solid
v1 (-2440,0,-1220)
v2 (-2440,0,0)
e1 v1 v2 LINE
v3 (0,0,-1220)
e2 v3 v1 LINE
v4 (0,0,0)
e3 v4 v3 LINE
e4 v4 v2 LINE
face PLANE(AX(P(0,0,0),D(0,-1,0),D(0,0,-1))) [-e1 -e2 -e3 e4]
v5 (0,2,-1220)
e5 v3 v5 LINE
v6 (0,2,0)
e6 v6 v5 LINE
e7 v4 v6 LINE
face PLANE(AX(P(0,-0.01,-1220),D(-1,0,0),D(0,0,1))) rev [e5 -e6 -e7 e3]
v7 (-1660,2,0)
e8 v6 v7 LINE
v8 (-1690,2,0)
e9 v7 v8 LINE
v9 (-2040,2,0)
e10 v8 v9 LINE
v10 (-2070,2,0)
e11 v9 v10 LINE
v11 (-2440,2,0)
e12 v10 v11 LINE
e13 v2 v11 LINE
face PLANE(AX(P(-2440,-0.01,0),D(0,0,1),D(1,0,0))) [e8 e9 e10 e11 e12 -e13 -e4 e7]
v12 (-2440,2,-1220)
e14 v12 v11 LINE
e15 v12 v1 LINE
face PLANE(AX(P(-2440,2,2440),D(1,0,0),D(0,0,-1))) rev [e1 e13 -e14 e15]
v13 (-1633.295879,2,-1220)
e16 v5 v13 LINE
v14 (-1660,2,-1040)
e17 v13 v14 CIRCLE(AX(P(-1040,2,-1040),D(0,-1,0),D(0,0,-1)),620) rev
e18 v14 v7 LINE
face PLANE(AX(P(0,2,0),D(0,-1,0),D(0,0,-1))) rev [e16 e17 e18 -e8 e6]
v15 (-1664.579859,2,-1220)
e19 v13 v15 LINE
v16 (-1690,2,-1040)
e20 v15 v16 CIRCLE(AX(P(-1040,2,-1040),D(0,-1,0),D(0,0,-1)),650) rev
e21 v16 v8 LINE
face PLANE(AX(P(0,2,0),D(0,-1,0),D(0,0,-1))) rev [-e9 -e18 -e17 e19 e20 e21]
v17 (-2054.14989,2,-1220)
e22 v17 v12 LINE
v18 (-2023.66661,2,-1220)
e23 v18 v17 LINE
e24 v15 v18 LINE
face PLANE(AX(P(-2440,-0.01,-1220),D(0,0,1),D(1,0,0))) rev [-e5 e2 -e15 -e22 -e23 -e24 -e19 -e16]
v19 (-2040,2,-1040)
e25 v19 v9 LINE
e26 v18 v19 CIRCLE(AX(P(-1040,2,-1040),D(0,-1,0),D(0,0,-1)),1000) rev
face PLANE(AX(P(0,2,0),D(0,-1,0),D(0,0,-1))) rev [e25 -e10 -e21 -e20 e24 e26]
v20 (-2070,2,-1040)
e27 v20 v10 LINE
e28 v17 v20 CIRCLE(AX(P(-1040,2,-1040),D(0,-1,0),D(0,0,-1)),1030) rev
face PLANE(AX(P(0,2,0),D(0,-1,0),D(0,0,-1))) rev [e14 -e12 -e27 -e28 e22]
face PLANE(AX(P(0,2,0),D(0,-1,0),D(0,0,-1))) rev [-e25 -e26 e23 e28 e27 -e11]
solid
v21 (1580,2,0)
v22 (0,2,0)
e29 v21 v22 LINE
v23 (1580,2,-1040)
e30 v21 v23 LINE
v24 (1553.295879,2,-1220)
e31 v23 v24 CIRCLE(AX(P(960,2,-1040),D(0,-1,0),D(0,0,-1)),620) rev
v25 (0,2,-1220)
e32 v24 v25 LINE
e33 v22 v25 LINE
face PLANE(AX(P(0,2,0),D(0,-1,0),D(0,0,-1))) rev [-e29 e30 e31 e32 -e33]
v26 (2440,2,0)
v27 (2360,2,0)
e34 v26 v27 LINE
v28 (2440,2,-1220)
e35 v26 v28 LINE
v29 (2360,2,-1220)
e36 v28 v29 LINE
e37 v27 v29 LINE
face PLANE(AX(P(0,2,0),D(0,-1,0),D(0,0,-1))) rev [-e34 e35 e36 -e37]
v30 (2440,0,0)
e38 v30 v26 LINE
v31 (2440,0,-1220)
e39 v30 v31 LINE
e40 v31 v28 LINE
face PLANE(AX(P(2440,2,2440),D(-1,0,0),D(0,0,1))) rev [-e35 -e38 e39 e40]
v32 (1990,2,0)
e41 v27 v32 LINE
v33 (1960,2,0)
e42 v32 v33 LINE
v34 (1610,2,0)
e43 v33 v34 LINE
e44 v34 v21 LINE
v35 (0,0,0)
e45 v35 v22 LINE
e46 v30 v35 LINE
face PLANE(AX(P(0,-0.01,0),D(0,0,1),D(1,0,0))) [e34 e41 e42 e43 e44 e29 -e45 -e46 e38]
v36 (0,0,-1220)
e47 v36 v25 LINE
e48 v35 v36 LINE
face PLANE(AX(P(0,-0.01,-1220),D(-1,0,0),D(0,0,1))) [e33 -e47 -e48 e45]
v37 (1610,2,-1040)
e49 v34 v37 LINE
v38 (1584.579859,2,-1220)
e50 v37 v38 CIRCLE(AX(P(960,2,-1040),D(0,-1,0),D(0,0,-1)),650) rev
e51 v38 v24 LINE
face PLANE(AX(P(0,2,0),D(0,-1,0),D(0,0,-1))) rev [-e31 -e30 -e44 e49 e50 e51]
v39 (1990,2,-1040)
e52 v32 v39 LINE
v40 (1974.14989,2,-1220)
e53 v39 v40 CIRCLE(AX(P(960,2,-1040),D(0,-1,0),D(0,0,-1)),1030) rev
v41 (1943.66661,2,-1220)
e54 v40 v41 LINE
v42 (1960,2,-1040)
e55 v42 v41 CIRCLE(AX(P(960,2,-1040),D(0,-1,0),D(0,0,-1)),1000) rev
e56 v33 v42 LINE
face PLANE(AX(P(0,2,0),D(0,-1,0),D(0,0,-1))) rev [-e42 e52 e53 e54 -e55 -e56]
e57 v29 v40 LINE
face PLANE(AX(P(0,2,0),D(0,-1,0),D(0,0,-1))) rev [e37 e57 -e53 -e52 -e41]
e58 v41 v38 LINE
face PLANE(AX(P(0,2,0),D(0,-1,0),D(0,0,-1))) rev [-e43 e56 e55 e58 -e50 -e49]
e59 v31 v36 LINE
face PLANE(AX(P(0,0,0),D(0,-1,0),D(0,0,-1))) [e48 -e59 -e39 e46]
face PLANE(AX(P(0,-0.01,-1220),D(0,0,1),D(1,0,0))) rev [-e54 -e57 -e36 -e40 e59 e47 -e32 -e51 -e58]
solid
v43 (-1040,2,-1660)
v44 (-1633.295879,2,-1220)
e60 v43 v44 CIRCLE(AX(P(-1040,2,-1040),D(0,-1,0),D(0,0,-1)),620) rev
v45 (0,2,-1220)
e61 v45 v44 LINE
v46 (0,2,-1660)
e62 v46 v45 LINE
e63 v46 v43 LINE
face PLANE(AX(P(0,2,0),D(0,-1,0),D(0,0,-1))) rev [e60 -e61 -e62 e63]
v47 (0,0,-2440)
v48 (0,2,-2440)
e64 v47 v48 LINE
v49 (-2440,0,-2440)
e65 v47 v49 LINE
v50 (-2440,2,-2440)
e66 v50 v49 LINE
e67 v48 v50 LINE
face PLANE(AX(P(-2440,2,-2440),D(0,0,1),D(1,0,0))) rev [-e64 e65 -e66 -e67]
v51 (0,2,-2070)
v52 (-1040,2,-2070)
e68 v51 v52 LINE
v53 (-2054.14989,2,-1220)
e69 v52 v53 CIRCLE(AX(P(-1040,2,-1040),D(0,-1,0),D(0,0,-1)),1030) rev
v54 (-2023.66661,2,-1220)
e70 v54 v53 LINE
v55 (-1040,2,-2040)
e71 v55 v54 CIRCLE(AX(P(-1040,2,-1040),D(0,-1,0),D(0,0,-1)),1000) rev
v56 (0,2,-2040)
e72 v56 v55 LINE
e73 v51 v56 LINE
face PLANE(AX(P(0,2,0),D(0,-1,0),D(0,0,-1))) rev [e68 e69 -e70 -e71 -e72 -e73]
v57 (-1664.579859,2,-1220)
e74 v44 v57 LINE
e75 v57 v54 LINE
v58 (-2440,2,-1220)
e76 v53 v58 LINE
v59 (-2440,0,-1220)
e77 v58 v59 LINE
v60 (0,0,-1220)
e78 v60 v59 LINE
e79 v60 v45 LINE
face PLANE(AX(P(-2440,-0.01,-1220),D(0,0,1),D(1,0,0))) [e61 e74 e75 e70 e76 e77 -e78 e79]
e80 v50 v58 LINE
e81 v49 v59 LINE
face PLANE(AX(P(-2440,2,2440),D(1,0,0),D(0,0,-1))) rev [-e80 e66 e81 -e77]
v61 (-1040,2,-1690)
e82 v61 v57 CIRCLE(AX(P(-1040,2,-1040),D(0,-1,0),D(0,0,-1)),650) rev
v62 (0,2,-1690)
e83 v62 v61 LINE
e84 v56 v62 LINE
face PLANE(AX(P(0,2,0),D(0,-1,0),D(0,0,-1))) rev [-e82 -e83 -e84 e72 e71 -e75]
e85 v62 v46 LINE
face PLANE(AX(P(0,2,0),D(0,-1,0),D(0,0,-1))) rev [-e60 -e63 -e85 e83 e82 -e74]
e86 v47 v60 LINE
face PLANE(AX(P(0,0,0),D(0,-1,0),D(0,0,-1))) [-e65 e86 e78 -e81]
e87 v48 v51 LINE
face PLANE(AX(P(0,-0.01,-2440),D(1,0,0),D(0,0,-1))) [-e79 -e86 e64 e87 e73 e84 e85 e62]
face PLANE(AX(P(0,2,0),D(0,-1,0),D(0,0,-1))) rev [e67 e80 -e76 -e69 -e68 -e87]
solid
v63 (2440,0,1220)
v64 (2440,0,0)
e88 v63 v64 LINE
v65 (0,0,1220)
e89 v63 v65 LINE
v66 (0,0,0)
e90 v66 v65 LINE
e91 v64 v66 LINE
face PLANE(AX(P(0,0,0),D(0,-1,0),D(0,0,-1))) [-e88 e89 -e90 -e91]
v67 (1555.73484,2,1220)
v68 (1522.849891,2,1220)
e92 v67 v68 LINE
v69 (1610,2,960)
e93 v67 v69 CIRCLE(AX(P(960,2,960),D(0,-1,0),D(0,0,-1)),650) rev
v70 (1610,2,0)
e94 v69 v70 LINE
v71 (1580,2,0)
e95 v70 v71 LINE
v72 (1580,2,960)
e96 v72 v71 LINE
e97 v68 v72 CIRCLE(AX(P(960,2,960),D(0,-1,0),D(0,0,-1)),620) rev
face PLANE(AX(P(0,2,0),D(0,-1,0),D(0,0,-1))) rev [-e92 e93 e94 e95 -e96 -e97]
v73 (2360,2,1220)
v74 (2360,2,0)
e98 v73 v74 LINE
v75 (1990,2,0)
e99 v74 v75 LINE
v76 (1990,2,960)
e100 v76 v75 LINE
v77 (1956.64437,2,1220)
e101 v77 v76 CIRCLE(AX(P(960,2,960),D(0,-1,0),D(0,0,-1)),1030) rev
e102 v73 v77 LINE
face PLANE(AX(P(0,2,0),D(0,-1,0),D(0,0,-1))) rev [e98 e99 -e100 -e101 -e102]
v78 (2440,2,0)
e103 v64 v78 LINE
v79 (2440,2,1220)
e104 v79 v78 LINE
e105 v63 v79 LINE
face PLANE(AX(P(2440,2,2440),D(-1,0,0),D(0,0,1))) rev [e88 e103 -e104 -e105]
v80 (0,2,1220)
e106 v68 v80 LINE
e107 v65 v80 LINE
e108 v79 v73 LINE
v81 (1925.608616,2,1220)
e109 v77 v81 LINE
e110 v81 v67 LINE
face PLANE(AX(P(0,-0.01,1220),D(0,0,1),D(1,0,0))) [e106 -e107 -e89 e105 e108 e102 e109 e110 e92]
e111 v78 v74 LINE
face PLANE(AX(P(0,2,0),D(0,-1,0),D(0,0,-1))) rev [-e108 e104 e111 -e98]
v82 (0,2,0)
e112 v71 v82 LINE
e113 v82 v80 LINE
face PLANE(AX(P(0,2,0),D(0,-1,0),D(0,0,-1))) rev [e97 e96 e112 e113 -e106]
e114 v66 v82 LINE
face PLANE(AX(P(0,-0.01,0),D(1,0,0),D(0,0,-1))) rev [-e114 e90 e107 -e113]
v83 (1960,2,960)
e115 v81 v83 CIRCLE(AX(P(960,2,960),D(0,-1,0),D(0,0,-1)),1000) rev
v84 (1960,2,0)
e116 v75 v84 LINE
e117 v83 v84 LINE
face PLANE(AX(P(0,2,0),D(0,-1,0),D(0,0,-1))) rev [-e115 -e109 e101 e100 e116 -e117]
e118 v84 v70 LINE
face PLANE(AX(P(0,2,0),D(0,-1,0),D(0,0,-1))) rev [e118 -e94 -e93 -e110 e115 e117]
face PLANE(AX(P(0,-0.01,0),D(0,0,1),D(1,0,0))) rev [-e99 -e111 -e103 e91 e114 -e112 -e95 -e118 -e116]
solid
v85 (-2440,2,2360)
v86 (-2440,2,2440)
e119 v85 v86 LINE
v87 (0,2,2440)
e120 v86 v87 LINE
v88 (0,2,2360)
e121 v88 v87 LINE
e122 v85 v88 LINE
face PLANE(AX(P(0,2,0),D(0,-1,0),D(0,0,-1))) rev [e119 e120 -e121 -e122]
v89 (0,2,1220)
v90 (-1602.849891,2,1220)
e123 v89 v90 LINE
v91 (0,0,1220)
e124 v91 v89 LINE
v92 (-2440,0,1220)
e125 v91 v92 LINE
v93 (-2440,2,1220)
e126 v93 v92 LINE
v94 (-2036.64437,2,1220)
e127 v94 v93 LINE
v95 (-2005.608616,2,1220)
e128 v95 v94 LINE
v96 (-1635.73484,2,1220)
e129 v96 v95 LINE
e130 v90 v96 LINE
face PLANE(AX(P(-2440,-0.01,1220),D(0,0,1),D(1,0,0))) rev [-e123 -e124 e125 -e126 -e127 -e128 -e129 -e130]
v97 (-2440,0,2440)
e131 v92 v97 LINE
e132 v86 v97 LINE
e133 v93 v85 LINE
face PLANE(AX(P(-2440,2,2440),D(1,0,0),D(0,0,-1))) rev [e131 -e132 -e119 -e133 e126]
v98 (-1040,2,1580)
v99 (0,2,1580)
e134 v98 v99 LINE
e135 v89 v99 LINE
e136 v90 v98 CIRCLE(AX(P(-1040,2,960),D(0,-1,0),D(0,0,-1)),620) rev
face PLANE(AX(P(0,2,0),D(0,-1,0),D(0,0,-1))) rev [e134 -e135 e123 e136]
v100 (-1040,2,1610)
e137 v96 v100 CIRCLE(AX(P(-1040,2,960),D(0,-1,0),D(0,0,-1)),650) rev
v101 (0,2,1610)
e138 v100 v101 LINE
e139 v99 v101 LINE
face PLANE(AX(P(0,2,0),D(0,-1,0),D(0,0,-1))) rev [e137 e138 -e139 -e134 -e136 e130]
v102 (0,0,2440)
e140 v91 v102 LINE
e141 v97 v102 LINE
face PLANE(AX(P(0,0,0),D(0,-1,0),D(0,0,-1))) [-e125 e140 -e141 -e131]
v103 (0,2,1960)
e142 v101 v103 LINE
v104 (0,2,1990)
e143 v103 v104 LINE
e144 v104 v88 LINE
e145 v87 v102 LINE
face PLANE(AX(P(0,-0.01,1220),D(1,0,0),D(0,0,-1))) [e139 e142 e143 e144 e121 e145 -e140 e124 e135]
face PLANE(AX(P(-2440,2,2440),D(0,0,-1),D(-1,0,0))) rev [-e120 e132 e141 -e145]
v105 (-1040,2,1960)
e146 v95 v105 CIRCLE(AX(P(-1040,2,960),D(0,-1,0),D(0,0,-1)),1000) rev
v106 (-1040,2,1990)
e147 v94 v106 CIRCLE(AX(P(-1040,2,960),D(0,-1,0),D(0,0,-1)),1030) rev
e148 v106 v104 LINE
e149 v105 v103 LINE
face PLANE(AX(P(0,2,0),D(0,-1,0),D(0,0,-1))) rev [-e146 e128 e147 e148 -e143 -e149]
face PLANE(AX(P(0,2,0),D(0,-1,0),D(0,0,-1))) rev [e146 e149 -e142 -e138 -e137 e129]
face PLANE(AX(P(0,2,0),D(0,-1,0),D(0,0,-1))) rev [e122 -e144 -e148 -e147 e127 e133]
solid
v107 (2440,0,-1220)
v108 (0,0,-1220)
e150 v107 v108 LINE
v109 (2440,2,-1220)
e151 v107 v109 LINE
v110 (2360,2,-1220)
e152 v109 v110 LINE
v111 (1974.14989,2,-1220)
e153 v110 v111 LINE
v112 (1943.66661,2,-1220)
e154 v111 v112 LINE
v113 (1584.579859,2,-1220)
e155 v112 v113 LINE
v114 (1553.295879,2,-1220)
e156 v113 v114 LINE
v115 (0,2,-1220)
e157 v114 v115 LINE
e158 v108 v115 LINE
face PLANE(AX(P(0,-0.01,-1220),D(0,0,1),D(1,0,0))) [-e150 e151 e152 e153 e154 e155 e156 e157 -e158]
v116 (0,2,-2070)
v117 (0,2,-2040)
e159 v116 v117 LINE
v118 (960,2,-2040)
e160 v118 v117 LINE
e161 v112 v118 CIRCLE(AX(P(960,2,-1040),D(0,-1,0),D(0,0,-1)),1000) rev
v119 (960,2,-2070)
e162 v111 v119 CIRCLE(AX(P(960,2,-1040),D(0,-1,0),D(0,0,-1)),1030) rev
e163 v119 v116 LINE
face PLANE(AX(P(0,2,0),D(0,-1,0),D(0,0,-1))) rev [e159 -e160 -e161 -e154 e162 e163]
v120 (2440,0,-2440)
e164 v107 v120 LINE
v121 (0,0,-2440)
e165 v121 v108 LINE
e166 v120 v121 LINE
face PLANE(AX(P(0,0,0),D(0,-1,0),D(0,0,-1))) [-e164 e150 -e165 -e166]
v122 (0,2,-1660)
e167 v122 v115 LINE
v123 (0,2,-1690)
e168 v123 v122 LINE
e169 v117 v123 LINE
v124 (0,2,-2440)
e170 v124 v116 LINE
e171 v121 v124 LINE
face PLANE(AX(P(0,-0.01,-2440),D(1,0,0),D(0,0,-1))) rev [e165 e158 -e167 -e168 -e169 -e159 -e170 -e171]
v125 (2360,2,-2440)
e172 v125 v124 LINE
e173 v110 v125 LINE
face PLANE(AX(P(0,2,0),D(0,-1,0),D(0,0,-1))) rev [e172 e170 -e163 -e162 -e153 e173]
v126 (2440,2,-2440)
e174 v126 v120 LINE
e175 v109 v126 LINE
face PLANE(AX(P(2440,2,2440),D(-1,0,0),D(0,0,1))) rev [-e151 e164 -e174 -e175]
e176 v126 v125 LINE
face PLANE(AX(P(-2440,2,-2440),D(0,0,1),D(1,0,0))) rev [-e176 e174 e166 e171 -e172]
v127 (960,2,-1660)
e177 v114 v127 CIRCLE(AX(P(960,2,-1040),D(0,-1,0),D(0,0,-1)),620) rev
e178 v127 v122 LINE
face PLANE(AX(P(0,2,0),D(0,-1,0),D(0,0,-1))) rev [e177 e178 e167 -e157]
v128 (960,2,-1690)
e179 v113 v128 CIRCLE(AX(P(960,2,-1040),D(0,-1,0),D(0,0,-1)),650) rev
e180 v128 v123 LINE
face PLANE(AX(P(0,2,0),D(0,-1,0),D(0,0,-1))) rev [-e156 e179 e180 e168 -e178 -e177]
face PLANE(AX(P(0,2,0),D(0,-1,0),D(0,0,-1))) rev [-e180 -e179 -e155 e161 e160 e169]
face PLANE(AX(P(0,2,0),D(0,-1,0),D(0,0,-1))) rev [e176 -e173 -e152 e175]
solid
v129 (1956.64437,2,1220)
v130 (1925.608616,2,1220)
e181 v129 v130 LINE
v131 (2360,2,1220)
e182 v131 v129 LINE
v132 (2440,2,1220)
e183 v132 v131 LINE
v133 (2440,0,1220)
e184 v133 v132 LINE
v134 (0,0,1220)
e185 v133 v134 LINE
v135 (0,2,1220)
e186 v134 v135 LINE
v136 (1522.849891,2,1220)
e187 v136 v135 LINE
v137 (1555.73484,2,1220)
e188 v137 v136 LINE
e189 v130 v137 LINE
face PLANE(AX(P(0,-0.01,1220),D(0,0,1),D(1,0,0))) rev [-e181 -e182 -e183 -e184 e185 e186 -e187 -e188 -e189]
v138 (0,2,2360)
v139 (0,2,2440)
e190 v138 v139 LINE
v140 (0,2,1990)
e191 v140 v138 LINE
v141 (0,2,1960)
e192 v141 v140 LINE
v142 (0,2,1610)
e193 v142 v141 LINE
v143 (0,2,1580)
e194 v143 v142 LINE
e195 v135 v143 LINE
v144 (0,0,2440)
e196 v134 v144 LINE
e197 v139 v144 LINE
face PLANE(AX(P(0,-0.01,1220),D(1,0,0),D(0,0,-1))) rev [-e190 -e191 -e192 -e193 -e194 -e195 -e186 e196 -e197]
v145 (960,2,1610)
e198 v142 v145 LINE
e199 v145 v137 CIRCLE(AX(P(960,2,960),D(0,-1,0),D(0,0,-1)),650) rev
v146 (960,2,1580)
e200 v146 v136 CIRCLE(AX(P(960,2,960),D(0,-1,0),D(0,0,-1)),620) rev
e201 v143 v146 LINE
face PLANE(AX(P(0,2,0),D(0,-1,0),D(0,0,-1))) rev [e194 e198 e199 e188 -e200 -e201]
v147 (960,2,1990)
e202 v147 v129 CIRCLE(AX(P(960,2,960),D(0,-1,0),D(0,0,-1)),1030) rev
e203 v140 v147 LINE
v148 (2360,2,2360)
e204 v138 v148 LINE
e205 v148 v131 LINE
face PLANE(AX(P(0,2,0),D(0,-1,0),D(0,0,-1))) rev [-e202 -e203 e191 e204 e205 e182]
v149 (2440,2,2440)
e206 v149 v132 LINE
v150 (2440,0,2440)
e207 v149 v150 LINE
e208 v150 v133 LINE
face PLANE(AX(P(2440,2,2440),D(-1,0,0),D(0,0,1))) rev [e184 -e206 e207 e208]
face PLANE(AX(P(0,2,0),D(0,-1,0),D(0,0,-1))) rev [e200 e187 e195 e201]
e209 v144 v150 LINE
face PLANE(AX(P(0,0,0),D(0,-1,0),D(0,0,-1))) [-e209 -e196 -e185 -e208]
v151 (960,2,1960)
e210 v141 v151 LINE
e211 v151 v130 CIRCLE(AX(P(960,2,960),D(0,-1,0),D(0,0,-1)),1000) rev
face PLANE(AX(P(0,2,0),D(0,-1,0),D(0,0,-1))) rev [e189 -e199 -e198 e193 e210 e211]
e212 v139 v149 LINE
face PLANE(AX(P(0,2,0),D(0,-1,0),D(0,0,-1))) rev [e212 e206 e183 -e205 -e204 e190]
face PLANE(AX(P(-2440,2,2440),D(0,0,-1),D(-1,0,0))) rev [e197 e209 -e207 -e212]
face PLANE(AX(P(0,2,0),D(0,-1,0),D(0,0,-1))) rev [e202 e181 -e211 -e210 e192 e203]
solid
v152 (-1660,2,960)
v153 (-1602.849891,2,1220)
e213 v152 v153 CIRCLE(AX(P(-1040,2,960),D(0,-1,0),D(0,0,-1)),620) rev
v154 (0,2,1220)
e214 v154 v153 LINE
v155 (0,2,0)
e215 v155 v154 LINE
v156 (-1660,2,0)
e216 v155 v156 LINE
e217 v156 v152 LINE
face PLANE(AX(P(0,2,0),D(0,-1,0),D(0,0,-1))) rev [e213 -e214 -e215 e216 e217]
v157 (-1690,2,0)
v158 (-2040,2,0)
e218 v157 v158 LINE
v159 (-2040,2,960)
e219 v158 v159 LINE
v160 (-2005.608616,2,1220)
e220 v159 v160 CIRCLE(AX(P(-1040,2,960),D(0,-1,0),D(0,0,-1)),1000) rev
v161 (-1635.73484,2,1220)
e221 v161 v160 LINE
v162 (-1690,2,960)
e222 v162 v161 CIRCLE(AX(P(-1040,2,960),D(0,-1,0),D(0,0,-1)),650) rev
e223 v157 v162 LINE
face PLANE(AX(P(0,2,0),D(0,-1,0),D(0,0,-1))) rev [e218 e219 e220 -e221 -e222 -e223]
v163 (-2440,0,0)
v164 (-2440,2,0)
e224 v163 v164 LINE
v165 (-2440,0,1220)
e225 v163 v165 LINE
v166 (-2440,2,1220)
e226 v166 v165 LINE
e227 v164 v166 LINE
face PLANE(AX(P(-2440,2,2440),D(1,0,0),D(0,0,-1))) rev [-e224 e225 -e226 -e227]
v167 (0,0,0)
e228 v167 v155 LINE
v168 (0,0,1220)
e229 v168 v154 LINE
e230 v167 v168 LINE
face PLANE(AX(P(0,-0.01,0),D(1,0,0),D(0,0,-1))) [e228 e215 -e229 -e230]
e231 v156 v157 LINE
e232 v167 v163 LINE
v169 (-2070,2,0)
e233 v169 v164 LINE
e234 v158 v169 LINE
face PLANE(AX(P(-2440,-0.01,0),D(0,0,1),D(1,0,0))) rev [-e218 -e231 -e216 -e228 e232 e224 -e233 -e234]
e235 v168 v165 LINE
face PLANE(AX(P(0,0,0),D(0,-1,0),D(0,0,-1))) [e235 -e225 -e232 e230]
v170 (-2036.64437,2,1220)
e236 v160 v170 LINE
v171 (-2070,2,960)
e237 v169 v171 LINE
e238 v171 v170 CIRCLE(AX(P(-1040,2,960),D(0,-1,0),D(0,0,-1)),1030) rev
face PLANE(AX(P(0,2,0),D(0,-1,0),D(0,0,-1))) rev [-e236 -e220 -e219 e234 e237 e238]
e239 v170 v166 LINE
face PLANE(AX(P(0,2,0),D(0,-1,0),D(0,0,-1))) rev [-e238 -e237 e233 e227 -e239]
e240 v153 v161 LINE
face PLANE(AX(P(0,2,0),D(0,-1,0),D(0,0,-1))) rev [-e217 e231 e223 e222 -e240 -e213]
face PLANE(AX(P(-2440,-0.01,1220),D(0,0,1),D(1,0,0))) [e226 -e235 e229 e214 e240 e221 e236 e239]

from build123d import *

# Parameters (mm, degrees)
SKETCH1_W           = 4880
SKETCH1_H           = 4880
BOSS_EXTRUDE1_DEPTH = 2
SPLIT1_START        = -1220
SPLIT1_OUTLINE_W    = 4880
SPLIT1_OUTLINE_H    = 2
SPLIT1_DEPTH        = 3660
SPLIT1_START_2      = -2440
SPLIT1_2_OUTLINE_W  = 2440
SPLIT1_2_OUTLINE_H  = 2
SPLIT1_2_DEPTH      = 1220
SPLIT1_START_3      = 1220
SPLIT1_3_OUTLINE_W  = 2440
SPLIT1_3_OUTLINE_H  = 2
SPLIT1_3_DEPTH      = 1220
SPLIT1_4_OUTLINE_W  = 2
SPLIT1_4_OUTLINE_H  = 1220
SPLIT1_4_DEPTH      = 2440
SPLIT1_5_OUTLINE_W  = 2440
SPLIT1_5_OUTLINE_H  = 2
SPLIT1_5_DEPTH      = 1220
SPLIT1_6_OUTLINE_W  = 2440
SPLIT1_6_OUTLINE_H  = 2
SPLIT1_6_DEPTH      = 1220
SPLIT1_7_OUTLINE_W  = 2440
SPLIT1_7_OUTLINE_H  = 2
SPLIT1_7_DEPTH      = 1220
SPLIT1_8_OUTLINE_W  = 2
SPLIT1_8_OUTLINE_H  = 1220
SPLIT1_8_DEPTH      = 2440
SPLIT1_9_OUTLINE_W  = 2440
SPLIT1_9_OUTLINE_H  = 2
SPLIT1_9_DEPTH      = 1220


# Read off the part's stored shape, not the designer's step: Split1
with BuildPart() as part:
    # Sketch1 → Boss-Extrude1 (new body)
    with BuildSketch(Plane(origin=(0, 0, 0), x_dir=(1, 0, 0), z_dir=(0, 1, 0))):
        Rectangle(SKETCH1_W, SKETCH1_H)
    extrude(amount=BOSS_EXTRUDE1_DEPTH)

    # Split1 outline → Split1 (cut)
    with BuildSketch(Plane.XY.offset(SPLIT1_START)):
        with Locations((0, 1)):
            Rectangle(SPLIT1_OUTLINE_W, SPLIT1_OUTLINE_H)
    extrude(amount=SPLIT1_DEPTH, mode=Mode.SUBTRACT)

    # Split1 2 outline → Split1 2 (cut)
    with BuildSketch(Plane.XY.offset(SPLIT1_START_2)):
        with Locations((1220, 1)):
            Rectangle(SPLIT1_2_OUTLINE_W, SPLIT1_2_OUTLINE_H)
    extrude(amount=SPLIT1_2_DEPTH, mode=Mode.SUBTRACT)


with BuildPart() as body_2:
    # Split1 3 outline → Split1 3 (new body)
    with BuildSketch(Plane.XY.offset(SPLIT1_START_3)):
        with Locations((-1220, 1)):
            Rectangle(SPLIT1_3_OUTLINE_W, SPLIT1_3_OUTLINE_H)
    extrude(amount=SPLIT1_3_DEPTH)


with BuildPart() as body_3:
    # Split1 4 outline → Split1 4 (new body)
    with BuildSketch(Plane.YZ):
        with Locations((1, 1830)):
            Rectangle(SPLIT1_4_OUTLINE_W, SPLIT1_4_OUTLINE_H)
    extrude(amount=SPLIT1_4_DEPTH)


with BuildPart() as body_4:
    # Split1 5 outline → Split1 5 (new body)
    with BuildSketch(Plane.XY.offset(SPLIT1_START)):
        with Locations((1220, 1)):
            Rectangle(SPLIT1_5_OUTLINE_W, SPLIT1_5_OUTLINE_H)
    extrude(amount=SPLIT1_5_DEPTH)


with BuildPart() as body_5:
    # Split1 6 outline → Split1 6 (new body)
    with BuildSketch(Plane.XY):
        with Locations((-1220, 1)):
            Rectangle(SPLIT1_6_OUTLINE_W, SPLIT1_6_OUTLINE_H)
    extrude(amount=SPLIT1_6_DEPTH)


with BuildPart() as body_6:
    # Split1 7 outline → Split1 7 (new body)
    with BuildSketch(Plane.XY):
        with Locations((1220, 1)):
            Rectangle(SPLIT1_7_OUTLINE_W, SPLIT1_7_OUTLINE_H)
    extrude(amount=SPLIT1_7_DEPTH)


with BuildPart() as body_7:
    # Split1 8 outline → Split1 8 (new body)
    with BuildSketch(Plane.YZ):
        with Locations((1, -1830)):
            Rectangle(SPLIT1_8_OUTLINE_W, SPLIT1_8_OUTLINE_H)
    extrude(amount=SPLIT1_8_DEPTH)


with BuildPart() as body_8:
    # Split1 9 outline → Split1 9 (new body)
    with BuildSketch(Plane.XY.offset(SPLIT1_START)):
        with Locations((-1220, 1)):
            Rectangle(SPLIT1_9_OUTLINE_W, SPLIT1_9_OUTLINE_H)
    extrude(amount=SPLIT1_9_DEPTH)


solid = Compound([part.part, body_2.part, body_3.part, body_4.part, body_5.part, body_6.part, body_7.part, body_8.part])
